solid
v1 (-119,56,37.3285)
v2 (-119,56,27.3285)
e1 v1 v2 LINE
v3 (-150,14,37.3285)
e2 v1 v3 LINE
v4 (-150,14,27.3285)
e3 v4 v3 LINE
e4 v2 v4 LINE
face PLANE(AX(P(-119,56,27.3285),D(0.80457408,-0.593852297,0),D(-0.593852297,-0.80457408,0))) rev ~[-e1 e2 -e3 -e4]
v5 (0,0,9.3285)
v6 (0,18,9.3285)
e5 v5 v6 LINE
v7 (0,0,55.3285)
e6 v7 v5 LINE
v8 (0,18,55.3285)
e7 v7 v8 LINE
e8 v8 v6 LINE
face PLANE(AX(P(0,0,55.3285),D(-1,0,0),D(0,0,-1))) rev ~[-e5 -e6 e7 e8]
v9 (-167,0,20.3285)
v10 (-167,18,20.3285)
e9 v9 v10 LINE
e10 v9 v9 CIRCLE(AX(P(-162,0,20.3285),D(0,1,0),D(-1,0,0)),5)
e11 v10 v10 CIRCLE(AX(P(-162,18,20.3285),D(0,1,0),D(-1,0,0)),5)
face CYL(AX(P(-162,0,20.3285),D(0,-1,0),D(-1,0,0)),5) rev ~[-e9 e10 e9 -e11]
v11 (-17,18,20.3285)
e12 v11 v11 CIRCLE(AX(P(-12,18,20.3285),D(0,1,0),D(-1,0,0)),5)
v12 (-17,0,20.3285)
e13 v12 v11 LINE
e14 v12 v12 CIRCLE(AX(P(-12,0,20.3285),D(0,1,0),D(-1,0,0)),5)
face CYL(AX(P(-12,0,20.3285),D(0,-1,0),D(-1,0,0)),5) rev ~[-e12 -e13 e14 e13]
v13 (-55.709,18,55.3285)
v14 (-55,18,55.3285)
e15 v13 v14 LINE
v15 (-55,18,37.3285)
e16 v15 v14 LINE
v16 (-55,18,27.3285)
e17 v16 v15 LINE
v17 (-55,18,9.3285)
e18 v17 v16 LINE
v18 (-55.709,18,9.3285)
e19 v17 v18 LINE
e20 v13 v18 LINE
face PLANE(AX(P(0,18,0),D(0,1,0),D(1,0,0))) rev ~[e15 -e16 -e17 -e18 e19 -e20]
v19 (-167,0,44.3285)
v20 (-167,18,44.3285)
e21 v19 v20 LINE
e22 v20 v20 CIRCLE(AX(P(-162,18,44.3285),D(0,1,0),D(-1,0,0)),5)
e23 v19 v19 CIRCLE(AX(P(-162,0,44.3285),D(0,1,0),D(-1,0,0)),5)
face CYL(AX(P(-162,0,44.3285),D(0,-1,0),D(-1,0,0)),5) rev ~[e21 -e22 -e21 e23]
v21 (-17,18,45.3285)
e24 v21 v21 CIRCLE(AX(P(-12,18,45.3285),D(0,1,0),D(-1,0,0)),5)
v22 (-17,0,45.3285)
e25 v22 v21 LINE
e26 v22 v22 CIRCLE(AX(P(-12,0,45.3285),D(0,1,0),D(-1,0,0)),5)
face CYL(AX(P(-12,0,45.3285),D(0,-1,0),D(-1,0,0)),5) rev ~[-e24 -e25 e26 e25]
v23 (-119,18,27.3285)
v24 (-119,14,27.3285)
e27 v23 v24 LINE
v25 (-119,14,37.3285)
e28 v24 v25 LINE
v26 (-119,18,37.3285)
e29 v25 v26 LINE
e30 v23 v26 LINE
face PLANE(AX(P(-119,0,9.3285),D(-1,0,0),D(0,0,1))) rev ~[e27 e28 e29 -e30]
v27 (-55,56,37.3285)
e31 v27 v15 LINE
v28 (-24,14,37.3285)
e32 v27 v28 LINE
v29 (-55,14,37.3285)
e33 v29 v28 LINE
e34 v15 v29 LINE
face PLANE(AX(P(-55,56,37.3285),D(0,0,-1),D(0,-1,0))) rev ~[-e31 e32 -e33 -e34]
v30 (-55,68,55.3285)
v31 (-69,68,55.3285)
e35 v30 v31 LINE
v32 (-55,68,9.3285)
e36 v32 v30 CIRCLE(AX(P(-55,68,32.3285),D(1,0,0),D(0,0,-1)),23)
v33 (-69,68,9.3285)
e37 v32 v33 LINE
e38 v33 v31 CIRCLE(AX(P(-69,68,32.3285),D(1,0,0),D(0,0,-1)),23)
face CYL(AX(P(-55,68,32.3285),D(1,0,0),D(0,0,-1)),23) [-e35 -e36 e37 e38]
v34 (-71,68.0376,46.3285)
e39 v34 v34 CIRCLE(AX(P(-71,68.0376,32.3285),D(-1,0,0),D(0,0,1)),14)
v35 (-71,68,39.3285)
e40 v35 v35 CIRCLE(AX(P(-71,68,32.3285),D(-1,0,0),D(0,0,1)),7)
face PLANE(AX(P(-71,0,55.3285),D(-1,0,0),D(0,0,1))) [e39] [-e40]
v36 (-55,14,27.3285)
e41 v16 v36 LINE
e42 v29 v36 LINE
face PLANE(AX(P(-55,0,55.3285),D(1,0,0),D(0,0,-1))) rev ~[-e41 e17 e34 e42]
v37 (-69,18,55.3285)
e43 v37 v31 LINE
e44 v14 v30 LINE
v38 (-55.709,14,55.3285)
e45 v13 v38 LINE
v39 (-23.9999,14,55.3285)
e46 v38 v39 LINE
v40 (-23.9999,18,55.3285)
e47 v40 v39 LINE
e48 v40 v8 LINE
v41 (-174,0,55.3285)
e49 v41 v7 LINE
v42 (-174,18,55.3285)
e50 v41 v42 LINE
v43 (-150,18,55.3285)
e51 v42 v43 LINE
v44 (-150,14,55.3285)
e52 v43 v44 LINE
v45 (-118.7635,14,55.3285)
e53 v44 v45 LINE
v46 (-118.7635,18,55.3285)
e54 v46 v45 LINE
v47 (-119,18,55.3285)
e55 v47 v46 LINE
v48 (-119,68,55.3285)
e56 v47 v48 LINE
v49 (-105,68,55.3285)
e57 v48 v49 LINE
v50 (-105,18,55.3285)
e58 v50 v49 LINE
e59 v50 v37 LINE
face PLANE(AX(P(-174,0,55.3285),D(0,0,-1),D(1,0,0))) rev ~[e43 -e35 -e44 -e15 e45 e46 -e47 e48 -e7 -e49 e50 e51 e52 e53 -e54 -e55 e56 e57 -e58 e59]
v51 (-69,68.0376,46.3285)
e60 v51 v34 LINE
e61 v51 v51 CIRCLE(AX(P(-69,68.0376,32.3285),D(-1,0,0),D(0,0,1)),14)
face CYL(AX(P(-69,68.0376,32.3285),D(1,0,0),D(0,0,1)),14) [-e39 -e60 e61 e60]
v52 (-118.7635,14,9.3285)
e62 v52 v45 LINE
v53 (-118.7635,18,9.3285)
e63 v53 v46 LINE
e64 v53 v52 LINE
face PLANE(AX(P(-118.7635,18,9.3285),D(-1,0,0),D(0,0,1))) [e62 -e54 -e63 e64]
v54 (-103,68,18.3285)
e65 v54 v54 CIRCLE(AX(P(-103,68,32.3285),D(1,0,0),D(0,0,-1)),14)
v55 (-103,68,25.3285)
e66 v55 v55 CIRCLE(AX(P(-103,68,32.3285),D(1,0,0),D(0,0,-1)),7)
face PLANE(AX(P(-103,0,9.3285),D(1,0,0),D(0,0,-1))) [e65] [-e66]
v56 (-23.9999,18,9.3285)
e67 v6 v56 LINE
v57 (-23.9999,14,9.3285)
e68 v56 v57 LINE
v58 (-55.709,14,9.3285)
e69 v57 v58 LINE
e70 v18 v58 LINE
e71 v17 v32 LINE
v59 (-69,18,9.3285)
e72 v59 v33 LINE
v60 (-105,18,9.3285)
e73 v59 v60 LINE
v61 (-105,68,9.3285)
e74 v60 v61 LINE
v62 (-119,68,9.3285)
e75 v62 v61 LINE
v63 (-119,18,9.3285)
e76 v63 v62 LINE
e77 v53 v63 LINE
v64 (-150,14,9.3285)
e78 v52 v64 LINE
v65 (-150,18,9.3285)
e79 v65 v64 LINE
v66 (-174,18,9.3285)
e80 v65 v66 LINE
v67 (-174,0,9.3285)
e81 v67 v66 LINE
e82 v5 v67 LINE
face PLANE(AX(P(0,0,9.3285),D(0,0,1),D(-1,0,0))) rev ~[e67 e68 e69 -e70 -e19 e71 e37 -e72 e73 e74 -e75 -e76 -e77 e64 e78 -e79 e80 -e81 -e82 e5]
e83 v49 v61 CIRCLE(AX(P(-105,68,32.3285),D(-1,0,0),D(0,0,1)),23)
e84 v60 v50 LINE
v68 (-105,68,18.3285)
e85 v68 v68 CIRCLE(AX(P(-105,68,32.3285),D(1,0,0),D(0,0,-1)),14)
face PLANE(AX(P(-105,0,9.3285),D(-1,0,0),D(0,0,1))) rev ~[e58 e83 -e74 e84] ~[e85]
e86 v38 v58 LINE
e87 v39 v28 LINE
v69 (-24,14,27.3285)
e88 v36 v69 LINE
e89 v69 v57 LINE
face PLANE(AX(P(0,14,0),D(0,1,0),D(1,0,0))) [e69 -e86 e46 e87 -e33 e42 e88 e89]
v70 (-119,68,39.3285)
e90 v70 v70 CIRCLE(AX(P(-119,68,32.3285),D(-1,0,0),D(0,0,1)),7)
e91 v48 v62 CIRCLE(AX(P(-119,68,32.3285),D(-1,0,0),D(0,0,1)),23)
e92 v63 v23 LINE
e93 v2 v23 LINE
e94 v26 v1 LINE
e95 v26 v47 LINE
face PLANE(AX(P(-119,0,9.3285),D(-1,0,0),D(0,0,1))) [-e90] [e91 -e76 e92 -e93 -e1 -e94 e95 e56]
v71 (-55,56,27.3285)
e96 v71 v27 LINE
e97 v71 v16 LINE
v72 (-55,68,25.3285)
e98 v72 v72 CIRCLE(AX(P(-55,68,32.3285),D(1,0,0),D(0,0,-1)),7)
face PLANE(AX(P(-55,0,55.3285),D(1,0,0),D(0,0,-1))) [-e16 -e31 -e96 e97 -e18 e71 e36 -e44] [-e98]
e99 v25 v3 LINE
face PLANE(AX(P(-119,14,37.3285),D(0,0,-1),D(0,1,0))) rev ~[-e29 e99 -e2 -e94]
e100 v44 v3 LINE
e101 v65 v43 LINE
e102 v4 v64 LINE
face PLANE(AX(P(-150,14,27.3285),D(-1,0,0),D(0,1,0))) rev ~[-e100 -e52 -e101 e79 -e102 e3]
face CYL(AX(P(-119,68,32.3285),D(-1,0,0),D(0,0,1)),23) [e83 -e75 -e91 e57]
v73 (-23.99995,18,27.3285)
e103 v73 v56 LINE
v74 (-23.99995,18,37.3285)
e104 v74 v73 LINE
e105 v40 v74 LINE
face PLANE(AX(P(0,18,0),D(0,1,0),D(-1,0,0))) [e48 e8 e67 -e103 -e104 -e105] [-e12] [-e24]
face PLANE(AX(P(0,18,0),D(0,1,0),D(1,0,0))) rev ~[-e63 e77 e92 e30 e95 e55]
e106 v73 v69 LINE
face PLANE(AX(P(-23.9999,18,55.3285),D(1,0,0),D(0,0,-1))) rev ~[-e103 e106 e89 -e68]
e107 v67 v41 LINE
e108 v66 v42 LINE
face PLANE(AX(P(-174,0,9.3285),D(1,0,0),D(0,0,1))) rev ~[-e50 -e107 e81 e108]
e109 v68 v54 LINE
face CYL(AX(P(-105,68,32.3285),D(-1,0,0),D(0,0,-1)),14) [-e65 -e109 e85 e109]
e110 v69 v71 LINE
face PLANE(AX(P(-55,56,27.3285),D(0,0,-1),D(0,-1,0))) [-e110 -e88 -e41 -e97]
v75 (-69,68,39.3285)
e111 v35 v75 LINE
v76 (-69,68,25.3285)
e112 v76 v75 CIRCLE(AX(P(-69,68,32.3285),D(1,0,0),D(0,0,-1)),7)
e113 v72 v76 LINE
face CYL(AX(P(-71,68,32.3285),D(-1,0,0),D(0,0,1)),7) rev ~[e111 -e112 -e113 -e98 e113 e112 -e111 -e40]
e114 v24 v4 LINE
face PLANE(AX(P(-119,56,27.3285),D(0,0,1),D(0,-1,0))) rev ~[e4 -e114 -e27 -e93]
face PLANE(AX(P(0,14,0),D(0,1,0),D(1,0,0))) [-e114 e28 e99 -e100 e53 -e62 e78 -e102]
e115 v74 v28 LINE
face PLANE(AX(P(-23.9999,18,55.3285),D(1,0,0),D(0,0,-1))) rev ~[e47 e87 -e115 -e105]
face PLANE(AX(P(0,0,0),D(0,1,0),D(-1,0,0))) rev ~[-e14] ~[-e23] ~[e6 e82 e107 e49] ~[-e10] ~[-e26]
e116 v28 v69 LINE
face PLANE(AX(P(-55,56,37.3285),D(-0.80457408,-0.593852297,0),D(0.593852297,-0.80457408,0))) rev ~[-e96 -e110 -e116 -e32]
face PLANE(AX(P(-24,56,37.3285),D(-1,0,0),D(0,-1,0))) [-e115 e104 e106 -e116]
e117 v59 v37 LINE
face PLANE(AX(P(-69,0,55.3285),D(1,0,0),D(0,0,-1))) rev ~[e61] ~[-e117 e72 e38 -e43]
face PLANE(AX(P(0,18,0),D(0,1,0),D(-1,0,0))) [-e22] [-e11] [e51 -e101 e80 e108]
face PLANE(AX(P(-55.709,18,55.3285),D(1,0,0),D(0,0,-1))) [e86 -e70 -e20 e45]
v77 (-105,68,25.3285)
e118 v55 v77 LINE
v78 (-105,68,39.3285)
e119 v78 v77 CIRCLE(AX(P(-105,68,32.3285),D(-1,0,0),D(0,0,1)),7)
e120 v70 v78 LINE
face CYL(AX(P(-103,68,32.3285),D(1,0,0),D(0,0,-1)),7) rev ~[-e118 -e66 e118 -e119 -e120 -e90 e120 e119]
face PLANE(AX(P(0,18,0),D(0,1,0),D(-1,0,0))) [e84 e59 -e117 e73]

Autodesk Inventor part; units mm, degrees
ref_plane "YZ Plane" through (0, 0, 0) normal (1, 0, 0) x (0, 1, 0)
ref_plane "XZ Plane" through (0, 0, 0) normal (0, 1, 0) x (-1, 0, 0)
ref_plane "XY Plane" through (0, 0, 0) normal (0, 0, 1) x (1, 0, 0)
sketch "Sketch1" plane through (0, 0, 0) normal (0, 1, 0) x (-1, 0, 0)
  line L0 (0, 9.3285) -> (174, 9.3285)
  line L1 (174, 9.3285) -> (174, 55.3285)
  line L2 (174, 55.3285) -> (0, 55.3285)
  line L3 (0, 55.3285) -> (0, 9.3285)
  circle A0 centre (12, 45.3285) radius 5
  circle A1 centre (162, 44.3285) radius 5
  circle A2 centre (162, 20.3285) radius 5
  circle A3 centre (12, 20.3285) radius 5
  point P0 (0, 0)
  dimension "d0" = 174
  dimension "d1" = 46
  dimension "d2" = 10
  dimension "d3" = 12
  dimension "d4" = 10
  dimension "d5" = 10
  dimension "d6" = 11
  dimension "d7" = 12
  dimension "d8" = 10
  dimension "d9" = 12
  dimension "d10" = 11
  dimension "d11" = 10
  dimension "d12" = 12
  dimension "d13" = 11
extrude "Extrusion1" add sketch "Sketch1" along normal blind 18
ref_plane "Work Plane1" through (-55, 0, 55.3285) normal (1, 0, 0) x (0, 0, -1)
sketch "Sketch2" plane through (-55, 0, 55.3285) normal (1, 0, 0) x (0, 0, -1)
  line L0 (46, 18) -> (0, 18) projected
  line L1 (0, 18) -> (0, 68)
  line L2 (46, 18) -> (46, 68)
  circle A0 centre (23, 68) radius 7
  arc A1 (46, 68) -> (0, 68) centre (23, 68) ccw
  point P0 (55.3285, 0)
  dimension "d17" = 50
  dimension "d18" = 50
  dimension "d20" = 14
extrude "Extrusion2" add sketch "Sketch2" against normal blind 14
ref_plane "Work Plane2" through (-119, 0, 9.3285) normal (-1, 0, 0) x (0, 0, 1)
sketch "Sketch3" plane through (-119, 0, 9.3285) normal (-1, 0, 0) x (0, 0, 1)
  line L0 (0, 0) -> (0, 18) projected
  line L1 (0, 18) -> (0, 68)
  circle A0 centre (23, 68) radius 7 projected
  circle A1 centre (23, 68) radius 7
  line L2 (46, 0) -> (46, 18) projected
  line L3 (46, 18) -> (46, 68) projected
  line L4 (46, 18) -> (46, 68)
  arc A2 (46, 68) -> (0, 68) centre (23, 68) ccw
  line L5 (0, 18) -> (46, 18)
  point P0 (-9.3285, 0)
  dimension "d24" = 50
  dimension "d26" = 50
extrude "Extrusion3" add sketch "Sketch3" against normal blind 14
sketch "Sketch4" plane through (-105, 0, 9.3285) normal (1, 0, 0) x (0, 0, -1)
  line L0 (-46, 19.0772) -> (-46, 69.0772)
  circle A0 centre (-23, 68) radius 14
  point P0 (9.3285, 0)
  dimension "d31" = 28
extrude "Extrusion4" add sketch "Sketch4" along normal blind 2
sketch "Sketch5" plane through (-103, 68, 32.3285) normal (1, 0, 0) x (0, 0, -1)
  circle A0 centre (0, 0) radius 14 projected
  circle A1 centre (0, 0) radius 7
  point P0 (32.3285, -68)
  dimension "d34" = 14
extrude "Extrusion5" cut sketch "Sketch5" against normal blind 50 contours A1
sketch "Sketch6" plane through (0, 18, 0) normal (0, 1, 0) x (1, 0, 0)
  line L0 (0.0001, -55.3285) -> (-23.9999, -55.3285)
  line L1 (-23.9999, -55.3285) -> (-23.9999, -9.3285)
  line L2 (0, -9.3285) -> (-174, -9.3285) projected
  line L3 (-55.709, -55.3285) -> (-23.9999, -55.3285)
  line L4 (-23.9999, -9.3285) -> (-55.709, -9.3285)
  line L5 (-55.709, -55.3285) -> (-55.709, -9.3285)
  line L6 (-174, -55.3285) -> (-150, -55.3285)
  line L7 (-150, -55.3285) -> (-150, -9.3285)
  line L8 (-150, -55.3285) -> (-118.7635, -55.3285)
  line L9 (-174, -55.3285) -> (0, -55.3285) projected
  line L10 (-118.7635, -9.3285) -> (-118.7635, -55.3285)
  line L11 (-118.7635, -9.3285) -> (-150, -9.3285)
  point P0 (0, 0)
  dimension "d37" = 24
  dimension "d38" = 24
extrude "Extrusion6" cut sketch "Sketch6" against normal blind 4 contours L3 L5 L2 L1 | L8 L7 L2 L10
sketch "Sketch7" plane through (-55, 0, 55.3285) normal (1, 0, 0) x (0, 0, -1)
  line L0 (0, 18) -> (0, 68)
  line L1 (23, 56) -> (28, 56)
  line L2 (23, 56) -> (18, 56)
  line L3 (18, 56) -> (18, 14)
  line L4 (0, 14) -> (46, 14) projected
  line L5 (28, 56) -> (28, 14)
  line L6 (18, 14) -> (28, 14)
  point P0 (55.3285, 0)
  dimension "d45" = 5
  dimension "d46" = 5
extrude "Extrusion7" add sketch "Sketch7" along normal blind 31
sketch "Sketch8" plane through (-55, 14, 37.3285) normal (0, 0, 1) x (1, 0, 0)
  line L0 (0, 4) -> (0, 42) projected
  line L1 (31, 42) -> (31, 0) projected
  line L2 (0, 42) -> (31, 0)
  line L3 (31, 0) -> (31, 42)
  line L4 (31, 42) -> (0, 42)
  point P0 (55, -14)
extrude "Extrusion8" cut sketch "Sketch8" against normal blind 31
sketch "Sketch9" plane through (-119, 0, 9.3285) normal (-1, 0, 0) x (0, 0, 1)
  line L0 (0, 18) -> (0, 14) projected
  line L1 (0, 18) -> (0, 68)
  line L2 (28, 56) -> (18, 56) projected
  line L3 (23, 56) -> (28, 56)
  line L4 (23, 56) -> (18, 56)
  line L5 (18, 56) -> (18, 14)
  line L6 (0, 14) -> (46, 14) projected
  line L7 (28, 14) -> (28, 56)
  line L8 (28, 14) -> (18, 14)
  point P0 (-9.3285, 0)
  dimension "d55" = 5
extrude "Extrusion9" add sketch "Sketch9" along normal blind 31
sketch "Sketch10" plane through (-119, 14, 27.3285) normal (0, 0, -1) x (-1, 0, 0)
  line L0 (0, 42) -> (31, 0)
  line L1 (31, 0) -> (31, 42)
  line L2 (31, 42) -> (0, 42)
  point P0 (-119, -14)
extrude "Extrusion10" cut sketch "Sketch10" against normal blind 31
sketch "Sketch11" plane through (-69, 0, 55.3285) normal (-1, 0, 0) x (0, 0, 1)
  circle A0 centre (-23, 68.0376) radius 14
  point P0 (-55.3285, 0)
  dimension "d60" = 28
extrude "Extrusion11" add sketch "Sketch11" along normal blind 2
sketch "Sketch12" plane through (-71, 68.0376, 32.3285) normal (-1, 0, 0) x (0, 0, 1)
  circle A0 centre (0, -0.0376) radius 7 projected
  circle A1 centre (0, -0.0376) radius 7
  point P0 (-32.3285, -68.0376)
  dimension "d63" = 14
extrude "Extrusion12" cut sketch "Sketch12" against normal blind 50
properties part number "5 - Part1"
